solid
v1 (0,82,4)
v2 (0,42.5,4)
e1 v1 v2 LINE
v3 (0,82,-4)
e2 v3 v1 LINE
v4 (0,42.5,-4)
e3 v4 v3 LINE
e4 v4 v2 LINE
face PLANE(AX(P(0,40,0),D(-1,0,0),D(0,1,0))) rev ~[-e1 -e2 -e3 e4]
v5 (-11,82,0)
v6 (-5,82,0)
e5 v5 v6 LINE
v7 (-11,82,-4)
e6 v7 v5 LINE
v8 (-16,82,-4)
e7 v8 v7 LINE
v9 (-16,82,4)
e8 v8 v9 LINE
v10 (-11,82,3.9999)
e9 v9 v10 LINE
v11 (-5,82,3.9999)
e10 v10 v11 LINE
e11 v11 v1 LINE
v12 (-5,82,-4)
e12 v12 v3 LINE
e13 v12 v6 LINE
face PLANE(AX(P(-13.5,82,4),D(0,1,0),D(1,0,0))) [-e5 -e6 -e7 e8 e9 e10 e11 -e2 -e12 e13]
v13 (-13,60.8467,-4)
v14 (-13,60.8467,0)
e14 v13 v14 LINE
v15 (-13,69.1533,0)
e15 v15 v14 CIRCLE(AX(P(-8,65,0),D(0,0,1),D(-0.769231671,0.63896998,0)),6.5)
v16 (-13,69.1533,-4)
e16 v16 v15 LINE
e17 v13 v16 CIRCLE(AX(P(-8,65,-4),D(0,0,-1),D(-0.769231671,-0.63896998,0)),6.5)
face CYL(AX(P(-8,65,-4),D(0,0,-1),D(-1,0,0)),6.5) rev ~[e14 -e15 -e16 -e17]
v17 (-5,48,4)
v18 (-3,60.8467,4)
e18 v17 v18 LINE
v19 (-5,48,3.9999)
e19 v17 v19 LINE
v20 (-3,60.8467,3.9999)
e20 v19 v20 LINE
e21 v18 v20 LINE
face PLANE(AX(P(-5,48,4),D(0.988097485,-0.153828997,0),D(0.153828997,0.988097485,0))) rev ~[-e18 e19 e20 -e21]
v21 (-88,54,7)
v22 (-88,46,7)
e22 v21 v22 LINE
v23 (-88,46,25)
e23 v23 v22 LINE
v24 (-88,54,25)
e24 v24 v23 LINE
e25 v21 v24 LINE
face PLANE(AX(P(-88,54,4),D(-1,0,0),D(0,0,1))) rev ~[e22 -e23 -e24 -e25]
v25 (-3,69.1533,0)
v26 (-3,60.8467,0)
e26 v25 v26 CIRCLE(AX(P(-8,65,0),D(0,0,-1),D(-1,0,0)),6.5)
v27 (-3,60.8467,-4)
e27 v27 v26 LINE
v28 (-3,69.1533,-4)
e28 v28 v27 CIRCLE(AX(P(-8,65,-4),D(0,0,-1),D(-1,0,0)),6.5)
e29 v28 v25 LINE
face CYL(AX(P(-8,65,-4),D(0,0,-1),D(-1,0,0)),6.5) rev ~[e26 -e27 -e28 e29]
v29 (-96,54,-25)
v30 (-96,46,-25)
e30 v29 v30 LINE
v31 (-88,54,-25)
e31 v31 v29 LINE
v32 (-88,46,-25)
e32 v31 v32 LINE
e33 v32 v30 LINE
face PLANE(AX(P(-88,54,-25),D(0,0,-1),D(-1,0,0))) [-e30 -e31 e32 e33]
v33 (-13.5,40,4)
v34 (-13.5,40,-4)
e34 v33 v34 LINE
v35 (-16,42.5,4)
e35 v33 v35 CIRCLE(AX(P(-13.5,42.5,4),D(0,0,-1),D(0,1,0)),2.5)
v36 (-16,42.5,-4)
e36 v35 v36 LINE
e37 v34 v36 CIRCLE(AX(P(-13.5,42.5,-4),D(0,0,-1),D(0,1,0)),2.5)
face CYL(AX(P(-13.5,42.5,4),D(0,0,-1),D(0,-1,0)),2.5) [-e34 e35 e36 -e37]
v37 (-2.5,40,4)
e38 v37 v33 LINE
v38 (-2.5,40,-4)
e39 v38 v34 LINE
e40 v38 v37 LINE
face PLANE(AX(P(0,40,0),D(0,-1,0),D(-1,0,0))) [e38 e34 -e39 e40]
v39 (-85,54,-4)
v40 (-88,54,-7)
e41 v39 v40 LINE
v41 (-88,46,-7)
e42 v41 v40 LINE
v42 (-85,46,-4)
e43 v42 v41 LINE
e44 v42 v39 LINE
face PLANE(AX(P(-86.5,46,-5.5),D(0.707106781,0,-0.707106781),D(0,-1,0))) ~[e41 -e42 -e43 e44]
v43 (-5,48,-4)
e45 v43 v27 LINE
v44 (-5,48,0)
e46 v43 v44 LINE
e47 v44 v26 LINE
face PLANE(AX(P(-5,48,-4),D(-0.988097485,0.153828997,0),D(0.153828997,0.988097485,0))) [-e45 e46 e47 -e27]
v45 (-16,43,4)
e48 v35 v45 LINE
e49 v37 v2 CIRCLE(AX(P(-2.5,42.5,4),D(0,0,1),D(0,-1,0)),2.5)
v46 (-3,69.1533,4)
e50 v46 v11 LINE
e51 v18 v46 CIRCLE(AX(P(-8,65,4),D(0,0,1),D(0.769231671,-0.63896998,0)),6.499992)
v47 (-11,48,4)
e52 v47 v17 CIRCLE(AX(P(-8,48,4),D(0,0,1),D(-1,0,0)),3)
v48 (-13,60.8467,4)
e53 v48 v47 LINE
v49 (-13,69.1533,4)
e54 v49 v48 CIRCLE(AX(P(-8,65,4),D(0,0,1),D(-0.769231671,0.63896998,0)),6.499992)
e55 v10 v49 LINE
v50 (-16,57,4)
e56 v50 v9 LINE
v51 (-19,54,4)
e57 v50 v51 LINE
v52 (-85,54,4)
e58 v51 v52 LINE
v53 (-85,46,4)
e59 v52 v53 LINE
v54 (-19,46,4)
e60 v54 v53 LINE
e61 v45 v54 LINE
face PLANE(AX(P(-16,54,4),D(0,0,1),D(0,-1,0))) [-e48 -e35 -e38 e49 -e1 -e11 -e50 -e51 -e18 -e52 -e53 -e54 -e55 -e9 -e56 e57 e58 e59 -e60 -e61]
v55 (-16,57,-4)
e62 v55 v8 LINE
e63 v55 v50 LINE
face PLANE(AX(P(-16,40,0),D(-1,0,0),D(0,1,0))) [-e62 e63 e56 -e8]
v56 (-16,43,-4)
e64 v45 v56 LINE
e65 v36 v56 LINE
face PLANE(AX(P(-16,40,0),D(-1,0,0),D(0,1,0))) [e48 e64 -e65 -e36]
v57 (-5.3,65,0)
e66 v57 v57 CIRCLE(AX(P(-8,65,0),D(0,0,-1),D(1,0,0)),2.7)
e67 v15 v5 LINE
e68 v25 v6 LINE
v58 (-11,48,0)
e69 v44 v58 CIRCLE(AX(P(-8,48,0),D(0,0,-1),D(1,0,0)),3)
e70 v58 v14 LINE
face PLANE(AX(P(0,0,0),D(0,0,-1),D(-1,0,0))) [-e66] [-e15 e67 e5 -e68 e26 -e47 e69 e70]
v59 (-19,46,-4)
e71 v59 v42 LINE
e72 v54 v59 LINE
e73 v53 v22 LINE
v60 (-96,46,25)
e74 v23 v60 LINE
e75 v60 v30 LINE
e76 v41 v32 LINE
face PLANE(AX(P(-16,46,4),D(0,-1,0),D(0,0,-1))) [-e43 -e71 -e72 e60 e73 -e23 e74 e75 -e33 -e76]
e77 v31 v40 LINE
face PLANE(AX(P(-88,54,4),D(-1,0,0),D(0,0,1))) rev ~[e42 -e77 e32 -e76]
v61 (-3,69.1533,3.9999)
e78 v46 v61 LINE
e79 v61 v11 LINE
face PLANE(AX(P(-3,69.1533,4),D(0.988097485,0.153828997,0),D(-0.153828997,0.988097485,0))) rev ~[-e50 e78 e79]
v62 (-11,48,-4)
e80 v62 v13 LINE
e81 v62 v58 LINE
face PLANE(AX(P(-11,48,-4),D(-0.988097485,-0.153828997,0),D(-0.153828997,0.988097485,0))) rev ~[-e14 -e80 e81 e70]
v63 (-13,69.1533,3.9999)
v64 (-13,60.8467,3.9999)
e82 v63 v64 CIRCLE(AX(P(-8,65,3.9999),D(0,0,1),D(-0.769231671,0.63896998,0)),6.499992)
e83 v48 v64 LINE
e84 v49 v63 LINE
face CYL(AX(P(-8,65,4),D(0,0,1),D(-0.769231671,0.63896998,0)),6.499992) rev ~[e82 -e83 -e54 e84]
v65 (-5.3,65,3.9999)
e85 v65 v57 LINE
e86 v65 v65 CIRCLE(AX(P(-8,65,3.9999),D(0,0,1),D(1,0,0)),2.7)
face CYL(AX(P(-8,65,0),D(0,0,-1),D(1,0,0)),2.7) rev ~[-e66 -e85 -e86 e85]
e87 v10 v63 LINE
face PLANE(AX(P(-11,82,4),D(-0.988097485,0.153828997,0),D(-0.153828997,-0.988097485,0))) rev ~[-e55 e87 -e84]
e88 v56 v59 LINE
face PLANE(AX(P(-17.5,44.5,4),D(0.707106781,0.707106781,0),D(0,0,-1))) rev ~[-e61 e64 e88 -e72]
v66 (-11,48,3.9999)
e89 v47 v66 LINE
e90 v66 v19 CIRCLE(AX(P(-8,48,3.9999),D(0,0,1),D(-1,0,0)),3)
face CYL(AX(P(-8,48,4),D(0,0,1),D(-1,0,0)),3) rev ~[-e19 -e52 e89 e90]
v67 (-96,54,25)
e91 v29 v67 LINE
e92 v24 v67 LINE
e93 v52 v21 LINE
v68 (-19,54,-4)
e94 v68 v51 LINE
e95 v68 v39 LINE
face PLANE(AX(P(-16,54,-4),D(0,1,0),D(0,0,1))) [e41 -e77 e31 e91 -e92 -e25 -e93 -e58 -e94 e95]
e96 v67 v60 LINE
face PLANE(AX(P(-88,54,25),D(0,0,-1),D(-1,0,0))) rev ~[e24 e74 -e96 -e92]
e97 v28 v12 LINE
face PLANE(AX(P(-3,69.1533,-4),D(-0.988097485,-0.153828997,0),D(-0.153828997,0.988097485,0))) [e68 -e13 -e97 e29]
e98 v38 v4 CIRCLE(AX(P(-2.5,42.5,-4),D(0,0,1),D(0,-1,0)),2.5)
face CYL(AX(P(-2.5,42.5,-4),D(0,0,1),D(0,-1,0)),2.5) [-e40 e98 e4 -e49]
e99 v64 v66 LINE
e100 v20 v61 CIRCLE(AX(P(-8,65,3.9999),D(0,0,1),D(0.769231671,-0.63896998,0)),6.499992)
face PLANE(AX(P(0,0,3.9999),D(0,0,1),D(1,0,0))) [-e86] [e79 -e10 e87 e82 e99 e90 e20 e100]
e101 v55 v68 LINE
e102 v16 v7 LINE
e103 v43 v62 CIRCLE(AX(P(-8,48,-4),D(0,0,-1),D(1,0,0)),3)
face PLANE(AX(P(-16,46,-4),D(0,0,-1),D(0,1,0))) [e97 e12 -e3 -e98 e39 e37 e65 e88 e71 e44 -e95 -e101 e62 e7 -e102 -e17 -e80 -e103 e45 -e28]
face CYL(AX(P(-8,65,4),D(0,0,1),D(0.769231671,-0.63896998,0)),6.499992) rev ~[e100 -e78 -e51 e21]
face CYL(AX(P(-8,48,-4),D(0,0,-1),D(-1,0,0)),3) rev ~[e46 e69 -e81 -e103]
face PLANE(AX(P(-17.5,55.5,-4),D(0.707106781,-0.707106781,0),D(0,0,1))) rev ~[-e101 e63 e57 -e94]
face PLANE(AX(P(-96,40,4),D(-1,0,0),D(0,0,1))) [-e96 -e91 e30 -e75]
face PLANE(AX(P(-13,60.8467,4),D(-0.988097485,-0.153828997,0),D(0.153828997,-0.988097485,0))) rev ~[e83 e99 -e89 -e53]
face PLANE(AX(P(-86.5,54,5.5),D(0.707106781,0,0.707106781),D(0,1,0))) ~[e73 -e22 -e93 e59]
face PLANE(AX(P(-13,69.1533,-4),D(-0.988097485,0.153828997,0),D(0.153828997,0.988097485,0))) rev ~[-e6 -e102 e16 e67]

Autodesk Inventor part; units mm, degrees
ref_plane "YZ Plane" through (0, 0, 0) normal (1, 0, 0) x (0, 1, 0)
ref_plane "XZ Plane" through (0, 0, 0) normal (0, 1, 0) x (-1, 0, 0)
ref_plane "XY Plane" through (0, 0, 0) normal (0, 0, 1) x (1, 0, 0)
sketch "Skizze2" plane through (0, 0, 0) normal (0, 0, 1) x (1, 0, 0)
  line L0 (-19.9249, 0) -> (3.9249, 0) projected
  line L1 (0, -18.1036) -> (0, 108.6213) projected
  circle A0 centre (-8, 65) radius 2.7
  line L2 (0, 0) -> (0, 87.5)
  arc A1 (0, 87.5) -> (-2.5, 90) centre (-2.5, 87.5) ccw
  line L3 (-13.5, 90) -> (-2.5, 90)
  arc A2 (-13.5, 90) -> (-16, 87.5) centre (-13.5, 87.5) ccw
  line L4 (0, 42.5) -> (0, 87.5)
  line L5 (-16, 40) -> (-16, 87.5)
  line L6 (0, 40) -> (-16, 40)
  point P0 (-8, 90)
  dimension "d4" = 2.5
  dimension "d5" = 2.5
  dimension "d6" = 5.4
  dimension "d8" = 25
  dimension "d17" = 2.5
  dimension "d18" = 2.5
  dimension "d19" = 2.5
  dimension "d144" = 25
extrude "Extrusion1" add sketch "Skizze2" along normal mid plane 8
sketch "Skizze7" plane through (0, 0, -4) normal (0, 0, -1) x (-1, 0, 0)
  arc A0 (16, 87.5) -> (13.5, 90) centre (13.5, 87.5) ccw projected
  line L0 (13.5, 90) -> (2.5, 90) projected
  arc A1 (2.5, 90) -> (0, 87.5) centre (2.5, 87.5) ccw projected
  line L1 (0, 87.5) -> (0, 40) projected
  circle A2 centre (8, 65) radius 2.7 projected
  circle A3 centre (8, 65) radius 6.5
  line L2 (8, 85) -> (8, 45)
  line L3 (13, 82.2483) -> (13, 48.2483)
  line L4 (3, 48.3648) -> (3, 82.3648)
  line L5 (16, 40) -> (16, 87.5) projected
  line L6 (0, 40) -> (16, 40) projected
  circle A4 centre (8, 82) radius 3
  circle A5 centre (8, 48) radius 3
  line L7 (-2, 82) -> (18, 82)
  line L8 (-2, 48) -> (18, 48)
  line L9 (5, 48) -> (3, 60.8467)
  line L10 (11, 48) -> (13, 60.8467)
  line L11 (3, 69.1533) -> (5, 82)
  line L12 (13, 69.1533) -> (11, 82)
  point P0 (0, 0)
  point P1 (8, 65)
  dimension "d133" = 13
  dimension "d136" = 20
  dimension "d137" = 20
  dimension "d194" = 6
  dimension "d195" = 6
  dimension "d196" = 3
  dimension "d197" = 3
  dimension "d198" = 10
  dimension "d199" = 20
  dimension "d200" = 20
extrude "Extrusion5" cut sketch "Skizze7" against normal blind 4 contours L8 L2 A5 | A5 L2 L8 | A5 L2 A3 L10 | L3 A3 L2 A2 | A3 L3 | A3 L2 A4 L12 | L7 L2 A4 | A4 L2 L7 | A5 L8 L2 | A5 L9 A3 L2 | L2 L8 A5 | L2 A2 A3 L4 | A3 L11 A4 L2 | L2 L7 A4 | A4 L7 L2 | L4 A3
fillet "Rundung2" radius 2.5 2 edges at (0, 40, 0) (-16, 40, 0)
sketch "Skizze12" plane through (-16, 40, 4) normal (-1, 0, 0) x (0, 0, 1)
  line L0 (0, 47.5) -> (0, 0) projected
  line L1 (-8, 0) -> (-8, 47.5) projected
  line L2 (0, 47.5) -> (0, 2.5) projected
  line L3 (-8, 47.5) -> (0, 47.5) projected
  line L4 (-8, 2.5) -> (-8, 47.5) projected
  line L5 (0, 6) -> (-8, 6)
  line L6 (-8, 6) -> (-8, 14)
  line L7 (-8, 14) -> (0, 14)
  line L8 (0, 14) -> (0, 6)
  line L9 (0, 2.5) -> (-8, 2.5) projected
  point P0 (-4, -40)
  point P1 (0, 8)
  point P2 (-4, 20.6699)
  point P3 (0, 14)
  dimension "d184" = 8
extrude "Extrusion10" add sketch "Skizze12" along normal blind 80 contours L0 L5 L1 L7
sketch "Skizze17" plane through (-16, 54, 4) normal (0, 1, 0) x (1, 0, 0)
  line L0 (-80, 0) -> (-80, 8) projected
  line L1 (-72, 29) -> (-80, 29)
  line L2 (-72, -21) -> (-80, -21)
  line L3 (-80, 29) -> (-80, -21)
  line L4 (-72, 29) -> (-72, -21)
  line L5 (0, 8) -> (0, 0) projected
  line L6 (0, 8) -> (-80, 8) projected
  line L7 (-80, 0) -> (-80, 8) projected
  line L8 (0, 0) -> (-80, 0) projected
  line L9 (-80, 4) -> (0, 4)
  point P0 (16, 4)
  point P1 (-80, 8)
  dimension "d187" = 50
  dimension "d188" = 8
extrude "Extrusion15" add sketch "Skizze17" against normal blind 8 contours L8 L4 L2 L3 | L0 L9 L4 L8 | L0 L6 L4 L9 | L3 L1 L4 L6
chamfer "Fasen10" distance 3 angle 45 4 edges at (-16, 46, 0) (-16, 54, 0) (-88, 50, -4) (-88, 50, 4)
sketch "Skizze18" plane through (0, 0, 4) normal (0, 0, 1) x (1, 0, 0)
  circle A0 centre (-8, 65) radius 2.7 projected
  arc A1 (-13, 69.1533) -> (-13, 60.8467) centre (-8, 65) ccw projected
  line L0 (-11, 82) -> (-13, 69.1533) projected
  arc A2 (-5, 82) -> (-11, 82) centre (-8, 82) ccw projected
  line L1 (-3, 69.1533) -> (-5, 82) projected
  arc A3 (-3, 60.8467) -> (-3, 69.1533) centre (-8, 65) ccw projected
  line L2 (-5, 48) -> (-3, 60.8467) projected
  arc A4 (-11, 48) -> (-5, 48) centre (-8, 48) ccw projected
  line L3 (-13, 60.8467) -> (-11, 48) projected
  circle A5 centre (-8, 65) radius 2.7 projected
  point P0 (0, 0)
extrude "Extrusion16" cut sketch "Skizze18" against normal blind 0.0001
sketch "Skizze19" plane through (-13.5, 90, 4) normal (0, 1, 0) x (1, 0, 0)
  line L0 (11, 0) -> (0, 0) projected
  line L1 (0, 8) -> (11, 8) projected
  line L2 (11, 8) -> (11, 0) projected
  line L3 (13.5, 0) -> (11, 0) projected
  line L4 (13.5, 8) -> (13.5, 0) projected
  line L5 (11, 8) -> (13.5, 8) projected
  line L6 (-2.5, 8) -> (-2.5, 0) projected
  line L7 (0, 0) -> (-2.5, 0) projected
  line L8 (0, 0) -> (0, 8) projected
  line L9 (-2.5, 8) -> (0, 8) projected
  point P0 (13.5, 4)
extrude "Extrusion17" cut sketch "Skizze19" against normal blind 8
properties part number "Gripper neu"
